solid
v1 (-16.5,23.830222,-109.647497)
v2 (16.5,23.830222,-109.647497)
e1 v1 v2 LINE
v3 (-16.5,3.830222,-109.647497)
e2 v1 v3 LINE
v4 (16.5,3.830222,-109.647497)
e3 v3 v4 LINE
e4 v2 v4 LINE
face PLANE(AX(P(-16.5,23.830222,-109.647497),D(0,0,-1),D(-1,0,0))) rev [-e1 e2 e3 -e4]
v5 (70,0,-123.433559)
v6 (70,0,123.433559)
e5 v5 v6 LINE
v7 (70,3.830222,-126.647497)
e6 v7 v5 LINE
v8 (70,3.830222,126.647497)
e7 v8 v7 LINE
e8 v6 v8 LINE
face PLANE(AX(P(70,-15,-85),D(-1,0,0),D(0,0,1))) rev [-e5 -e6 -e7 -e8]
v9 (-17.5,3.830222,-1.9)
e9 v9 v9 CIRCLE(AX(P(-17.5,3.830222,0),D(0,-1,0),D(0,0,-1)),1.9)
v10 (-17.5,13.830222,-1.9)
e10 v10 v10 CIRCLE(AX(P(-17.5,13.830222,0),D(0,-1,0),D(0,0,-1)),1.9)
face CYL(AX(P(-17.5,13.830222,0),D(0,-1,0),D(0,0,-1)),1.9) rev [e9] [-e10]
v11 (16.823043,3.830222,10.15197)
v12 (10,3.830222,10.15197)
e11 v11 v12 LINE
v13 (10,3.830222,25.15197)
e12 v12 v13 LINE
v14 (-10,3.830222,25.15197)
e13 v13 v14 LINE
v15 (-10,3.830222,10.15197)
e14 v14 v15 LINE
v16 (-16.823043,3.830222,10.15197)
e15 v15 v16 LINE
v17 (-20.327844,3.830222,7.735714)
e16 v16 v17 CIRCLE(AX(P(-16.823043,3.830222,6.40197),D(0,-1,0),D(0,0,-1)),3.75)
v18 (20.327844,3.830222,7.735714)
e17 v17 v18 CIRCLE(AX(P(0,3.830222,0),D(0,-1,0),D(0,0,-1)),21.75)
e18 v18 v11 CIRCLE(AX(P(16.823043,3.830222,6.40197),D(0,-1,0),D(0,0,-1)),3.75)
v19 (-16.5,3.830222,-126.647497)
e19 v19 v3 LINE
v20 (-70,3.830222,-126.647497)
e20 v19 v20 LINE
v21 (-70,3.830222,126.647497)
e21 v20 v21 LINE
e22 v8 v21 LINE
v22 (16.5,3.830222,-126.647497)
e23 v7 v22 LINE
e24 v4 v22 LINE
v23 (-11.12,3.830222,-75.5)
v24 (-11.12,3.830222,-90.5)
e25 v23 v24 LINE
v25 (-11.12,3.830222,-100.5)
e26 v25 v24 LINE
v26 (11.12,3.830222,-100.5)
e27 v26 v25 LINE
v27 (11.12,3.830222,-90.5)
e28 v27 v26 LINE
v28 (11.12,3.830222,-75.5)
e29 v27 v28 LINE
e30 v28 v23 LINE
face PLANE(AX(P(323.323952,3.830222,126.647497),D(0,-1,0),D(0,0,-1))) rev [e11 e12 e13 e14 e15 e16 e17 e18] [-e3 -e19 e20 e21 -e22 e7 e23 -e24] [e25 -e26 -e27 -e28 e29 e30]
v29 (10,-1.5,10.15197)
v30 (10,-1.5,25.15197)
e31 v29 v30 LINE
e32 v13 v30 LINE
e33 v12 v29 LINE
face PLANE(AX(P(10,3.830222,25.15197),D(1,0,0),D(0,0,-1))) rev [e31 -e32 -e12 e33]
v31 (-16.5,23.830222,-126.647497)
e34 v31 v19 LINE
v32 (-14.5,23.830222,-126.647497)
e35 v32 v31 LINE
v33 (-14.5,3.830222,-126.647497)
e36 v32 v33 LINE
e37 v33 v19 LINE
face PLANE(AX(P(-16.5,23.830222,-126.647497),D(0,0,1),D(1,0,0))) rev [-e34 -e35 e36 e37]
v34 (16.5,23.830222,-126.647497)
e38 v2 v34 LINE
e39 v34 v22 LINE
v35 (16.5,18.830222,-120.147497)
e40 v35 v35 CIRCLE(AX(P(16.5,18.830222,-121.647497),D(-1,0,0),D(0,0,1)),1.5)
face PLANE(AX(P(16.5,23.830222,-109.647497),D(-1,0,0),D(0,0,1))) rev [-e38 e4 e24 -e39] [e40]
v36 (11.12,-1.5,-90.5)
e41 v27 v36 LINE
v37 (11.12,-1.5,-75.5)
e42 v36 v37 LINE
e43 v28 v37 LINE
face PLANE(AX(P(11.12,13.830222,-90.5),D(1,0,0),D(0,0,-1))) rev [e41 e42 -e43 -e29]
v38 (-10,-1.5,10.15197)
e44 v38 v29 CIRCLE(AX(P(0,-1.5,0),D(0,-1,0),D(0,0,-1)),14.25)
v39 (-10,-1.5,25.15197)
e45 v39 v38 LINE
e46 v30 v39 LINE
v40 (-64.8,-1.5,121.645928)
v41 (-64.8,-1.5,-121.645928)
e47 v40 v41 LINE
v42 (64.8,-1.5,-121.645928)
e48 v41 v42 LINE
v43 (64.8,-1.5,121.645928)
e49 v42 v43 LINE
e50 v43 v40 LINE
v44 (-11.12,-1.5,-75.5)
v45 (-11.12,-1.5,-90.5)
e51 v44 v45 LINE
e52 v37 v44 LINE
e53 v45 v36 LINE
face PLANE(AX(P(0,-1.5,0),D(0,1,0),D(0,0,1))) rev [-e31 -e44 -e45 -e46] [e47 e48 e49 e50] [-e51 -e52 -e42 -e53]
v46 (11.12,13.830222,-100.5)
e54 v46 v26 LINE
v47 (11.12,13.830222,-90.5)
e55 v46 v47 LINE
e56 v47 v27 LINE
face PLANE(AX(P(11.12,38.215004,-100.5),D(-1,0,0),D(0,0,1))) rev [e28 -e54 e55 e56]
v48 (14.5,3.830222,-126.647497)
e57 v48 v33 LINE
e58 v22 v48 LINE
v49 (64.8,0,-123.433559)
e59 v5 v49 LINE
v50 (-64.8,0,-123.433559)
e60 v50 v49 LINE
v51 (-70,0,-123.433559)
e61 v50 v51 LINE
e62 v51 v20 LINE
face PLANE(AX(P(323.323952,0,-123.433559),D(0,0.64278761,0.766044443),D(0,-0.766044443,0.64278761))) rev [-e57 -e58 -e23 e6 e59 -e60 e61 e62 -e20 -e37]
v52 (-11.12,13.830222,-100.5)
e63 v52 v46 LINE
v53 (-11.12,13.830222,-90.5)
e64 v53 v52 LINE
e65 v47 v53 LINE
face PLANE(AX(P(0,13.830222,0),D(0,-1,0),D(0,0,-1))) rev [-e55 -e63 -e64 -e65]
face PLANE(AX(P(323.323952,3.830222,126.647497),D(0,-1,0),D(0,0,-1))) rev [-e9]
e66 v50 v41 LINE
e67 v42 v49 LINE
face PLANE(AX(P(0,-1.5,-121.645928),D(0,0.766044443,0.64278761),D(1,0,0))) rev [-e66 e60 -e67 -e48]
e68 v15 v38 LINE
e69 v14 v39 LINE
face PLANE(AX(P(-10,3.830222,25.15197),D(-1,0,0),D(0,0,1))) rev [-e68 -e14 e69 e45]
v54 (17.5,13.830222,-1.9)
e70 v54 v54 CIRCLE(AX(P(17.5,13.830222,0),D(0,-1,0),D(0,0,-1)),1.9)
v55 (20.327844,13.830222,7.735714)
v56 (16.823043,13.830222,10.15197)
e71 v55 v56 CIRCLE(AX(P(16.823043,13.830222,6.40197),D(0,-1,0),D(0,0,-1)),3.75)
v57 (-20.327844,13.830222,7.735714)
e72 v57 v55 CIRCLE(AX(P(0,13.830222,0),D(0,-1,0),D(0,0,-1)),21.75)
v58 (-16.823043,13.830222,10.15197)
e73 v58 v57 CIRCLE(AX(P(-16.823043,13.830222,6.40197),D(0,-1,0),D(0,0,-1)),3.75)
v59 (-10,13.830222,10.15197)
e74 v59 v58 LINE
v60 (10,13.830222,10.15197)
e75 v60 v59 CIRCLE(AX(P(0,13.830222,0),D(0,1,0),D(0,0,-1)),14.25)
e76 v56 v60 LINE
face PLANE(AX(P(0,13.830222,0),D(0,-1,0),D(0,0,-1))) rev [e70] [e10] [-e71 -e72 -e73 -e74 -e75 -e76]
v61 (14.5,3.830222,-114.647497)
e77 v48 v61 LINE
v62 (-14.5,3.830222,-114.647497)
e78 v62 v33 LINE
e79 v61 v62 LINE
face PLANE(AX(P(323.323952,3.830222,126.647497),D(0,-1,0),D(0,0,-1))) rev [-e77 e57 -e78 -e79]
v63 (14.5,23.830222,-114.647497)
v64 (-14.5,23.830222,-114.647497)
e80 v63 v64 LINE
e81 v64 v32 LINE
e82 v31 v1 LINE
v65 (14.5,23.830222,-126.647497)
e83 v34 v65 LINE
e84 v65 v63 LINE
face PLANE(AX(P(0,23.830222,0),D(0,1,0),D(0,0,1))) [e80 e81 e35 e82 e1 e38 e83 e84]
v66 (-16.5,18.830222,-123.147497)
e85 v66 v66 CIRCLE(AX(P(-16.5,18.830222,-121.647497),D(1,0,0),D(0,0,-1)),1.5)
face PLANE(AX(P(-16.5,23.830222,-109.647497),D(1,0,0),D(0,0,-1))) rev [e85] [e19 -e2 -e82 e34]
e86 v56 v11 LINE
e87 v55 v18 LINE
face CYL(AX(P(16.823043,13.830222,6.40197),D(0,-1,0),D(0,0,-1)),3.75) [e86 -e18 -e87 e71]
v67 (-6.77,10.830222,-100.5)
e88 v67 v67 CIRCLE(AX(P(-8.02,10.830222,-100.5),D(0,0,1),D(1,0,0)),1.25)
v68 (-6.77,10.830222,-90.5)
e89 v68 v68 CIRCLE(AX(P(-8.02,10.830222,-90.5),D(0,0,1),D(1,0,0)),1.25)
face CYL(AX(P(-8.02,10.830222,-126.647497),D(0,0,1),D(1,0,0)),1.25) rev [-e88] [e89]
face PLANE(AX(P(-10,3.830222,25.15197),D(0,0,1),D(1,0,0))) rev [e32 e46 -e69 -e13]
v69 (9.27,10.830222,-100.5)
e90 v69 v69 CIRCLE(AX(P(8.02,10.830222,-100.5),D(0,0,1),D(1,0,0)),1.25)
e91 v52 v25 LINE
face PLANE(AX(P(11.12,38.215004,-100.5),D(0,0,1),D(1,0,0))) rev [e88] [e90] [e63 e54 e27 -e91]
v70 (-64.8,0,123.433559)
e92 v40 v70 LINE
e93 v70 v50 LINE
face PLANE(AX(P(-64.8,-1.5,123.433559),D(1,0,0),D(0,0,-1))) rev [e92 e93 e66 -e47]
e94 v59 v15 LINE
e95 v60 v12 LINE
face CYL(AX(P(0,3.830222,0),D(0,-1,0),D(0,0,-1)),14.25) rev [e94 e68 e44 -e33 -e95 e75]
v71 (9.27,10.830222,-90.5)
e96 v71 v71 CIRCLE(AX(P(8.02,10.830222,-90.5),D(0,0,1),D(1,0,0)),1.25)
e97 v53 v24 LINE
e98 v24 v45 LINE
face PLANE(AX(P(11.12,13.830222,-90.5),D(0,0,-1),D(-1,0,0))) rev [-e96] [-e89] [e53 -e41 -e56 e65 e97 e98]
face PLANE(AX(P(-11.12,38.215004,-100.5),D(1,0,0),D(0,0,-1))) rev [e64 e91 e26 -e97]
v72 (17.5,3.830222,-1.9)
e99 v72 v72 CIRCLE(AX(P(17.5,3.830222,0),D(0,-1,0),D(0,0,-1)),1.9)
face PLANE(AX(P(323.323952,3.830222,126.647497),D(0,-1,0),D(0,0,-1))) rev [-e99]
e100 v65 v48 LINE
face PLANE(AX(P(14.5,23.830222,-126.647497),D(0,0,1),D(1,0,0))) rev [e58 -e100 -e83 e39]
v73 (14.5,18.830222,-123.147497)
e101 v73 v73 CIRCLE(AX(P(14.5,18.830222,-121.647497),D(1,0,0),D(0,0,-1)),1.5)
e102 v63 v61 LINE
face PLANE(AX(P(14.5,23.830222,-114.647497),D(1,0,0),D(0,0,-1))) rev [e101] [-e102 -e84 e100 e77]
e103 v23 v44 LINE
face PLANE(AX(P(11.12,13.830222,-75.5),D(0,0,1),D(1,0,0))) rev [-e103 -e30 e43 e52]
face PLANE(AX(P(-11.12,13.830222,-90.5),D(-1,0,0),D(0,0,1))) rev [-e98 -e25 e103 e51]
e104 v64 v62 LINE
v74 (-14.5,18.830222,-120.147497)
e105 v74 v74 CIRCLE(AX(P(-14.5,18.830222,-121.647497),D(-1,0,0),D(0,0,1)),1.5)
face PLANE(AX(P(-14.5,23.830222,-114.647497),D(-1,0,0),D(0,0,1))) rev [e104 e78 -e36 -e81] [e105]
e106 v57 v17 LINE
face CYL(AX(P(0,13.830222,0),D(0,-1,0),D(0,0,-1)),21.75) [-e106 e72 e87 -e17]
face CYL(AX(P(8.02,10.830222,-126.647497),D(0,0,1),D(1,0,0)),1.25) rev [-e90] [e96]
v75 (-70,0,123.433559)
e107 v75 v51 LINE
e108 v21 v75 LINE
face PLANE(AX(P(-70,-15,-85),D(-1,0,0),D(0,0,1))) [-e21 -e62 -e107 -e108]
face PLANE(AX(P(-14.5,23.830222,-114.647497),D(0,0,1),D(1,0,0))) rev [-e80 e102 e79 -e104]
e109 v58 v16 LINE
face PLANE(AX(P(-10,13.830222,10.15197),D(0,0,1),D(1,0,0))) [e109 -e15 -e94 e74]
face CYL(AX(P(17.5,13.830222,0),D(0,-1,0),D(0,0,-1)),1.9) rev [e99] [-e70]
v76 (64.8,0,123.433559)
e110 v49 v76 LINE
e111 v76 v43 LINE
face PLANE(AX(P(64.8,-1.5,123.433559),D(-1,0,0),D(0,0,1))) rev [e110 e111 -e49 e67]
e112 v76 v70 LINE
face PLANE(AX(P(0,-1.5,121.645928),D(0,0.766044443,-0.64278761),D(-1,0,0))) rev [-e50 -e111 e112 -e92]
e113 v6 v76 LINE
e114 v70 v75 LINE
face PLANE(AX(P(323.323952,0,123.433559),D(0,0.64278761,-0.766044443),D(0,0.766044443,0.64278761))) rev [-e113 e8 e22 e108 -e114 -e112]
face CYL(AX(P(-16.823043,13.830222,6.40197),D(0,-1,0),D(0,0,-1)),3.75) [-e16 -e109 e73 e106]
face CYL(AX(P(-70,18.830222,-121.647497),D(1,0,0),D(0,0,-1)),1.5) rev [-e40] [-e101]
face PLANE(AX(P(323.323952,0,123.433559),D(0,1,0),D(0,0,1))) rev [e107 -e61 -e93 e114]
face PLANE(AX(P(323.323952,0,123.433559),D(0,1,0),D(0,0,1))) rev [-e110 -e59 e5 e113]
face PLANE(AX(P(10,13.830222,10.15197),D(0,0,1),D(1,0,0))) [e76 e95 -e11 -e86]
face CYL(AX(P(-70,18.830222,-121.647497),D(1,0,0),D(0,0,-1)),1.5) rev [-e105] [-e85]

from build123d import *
from OCP.BRepFilletAPI import BRepFilletAPI_MakeChamfer

# Parameters (mm, degrees)
BOSS_EXTRU_1_DEPTH           = 70
BOSS_EXTRU_1_DEPTH_BACK      = 70
ESQUISSE12_W                 = 129.6
ESQUISSE12_H                 = 246.867117592
BOSS_EXTRU_7_DEPTH           = 1.5
CHANFREIN1_SIZE              = 1.5
CHANFREIN1_SIZE_2            = 1.787630389
ENL_V_MAT_EXTRU_1_DEPTH      = 209.036677197
ENL_V_MAT_EXTRU_1_DEPTH_BACK = 209.036677197
BOSS_EXTRU_4_START           = -10
ESQUISSE5_R                  = 1.9
BOSS_EXTRU_4_DEPTH           = 10
ENL_V_MAT_EXTRU_2_DEPTH      = 146.364588204
ENL_V_MAT_EXTRU_2_DEPTH_BACK = 146.364588204
ESQUISSE6_W                  = 22.24
ESQUISSE6_H                  = 15
ESQUISSE7_W                  = 22.24
ESQUISSE7_H                  = 10
BOSS_EXTRU_5_DEPTH           = 10
ESQUISSE8_R                  = 1.25
ENL_V_MAT_EXTRU_3_DEPTH      = 229.570143353
BOSS_EXTRU_6_DEPTH           = 20
ENL_V_MAT_EXTRU_4_DEPTH      = 147.654246266
ENL_V_MAT_EXTRU_4_DEPTH_BACK = 147.654246266
ESQUISSE11_R                 = 1.5


with BuildPart() as part:
    # Esquisse1 → Boss.-Extru.1 (new, two sides: drawn at the far end of the back side and taken through both)
    with BuildSketch(Plane(origin=(0, 0, 0), x_dir=(0, -1, 0), z_dir=(1, 0, 0)).offset(-BOSS_EXTRU_1_DEPTH_BACK)):
        Polygon((0, -123.433558796), (0, 123.433558796), (-3.830222216, 126.647496845), (-3.830222216, -126.647496845), align=None)
    extrude(amount=BOSS_EXTRU_1_DEPTH + BOSS_EXTRU_1_DEPTH_BACK)

    # Esquisse12 → Boss.-Extru.7 (add)
    with BuildSketch(Plane(origin=(0, 0, 0), x_dir=(-1, 0, 0), z_dir=(0, -1, 0))):
        Rectangle(ESQUISSE12_W, ESQUISSE12_H)
    extrude(amount=BOSS_EXTRU_7_DEPTH)

    # Chanfrein1
    chanfrein1_edges_1 = [part.edges().sort_by_distance(p)[0] for p in [
        (0, -1.5, 123.433558796),
    ]]
    chanfrein1_side_1 = [part.faces().sort_by_distance(p)[0] for p in [
        (0, -1.47, 123.433558796),
    ]]
    chanfrein1_edges_2 = [part.edges().sort_by_distance(p)[0] for p in [
        (0, -1.5, -123.433558796),
    ]]
    chanfrein1_side_2 = [part.faces().sort_by_distance(p)[0] for p in [
        (0, -1.47, -123.433558796),
    ]]
    chanfrein1 = BRepFilletAPI_MakeChamfer(part.part.solid().wrapped)
    for e in chanfrein1_edges_1:
        chanfrein1.Add(CHANFREIN1_SIZE - 0.0001, CHANFREIN1_SIZE_2 - 0.0001, e.wrapped, chanfrein1_side_1[0].wrapped)
    for e in chanfrein1_edges_2:
        chanfrein1.Add(CHANFREIN1_SIZE - 0.0001, CHANFREIN1_SIZE_2 - 0.0001, e.wrapped, chanfrein1_side_2[0].wrapped)
    add(Compound.cast(chanfrein1.Shape()), mode=Mode.REPLACE)  # a hair under: the kernel refuses the full size

    # Esquisse4 → Enlèv. mat.-Extru.1 (cut, two sides: drawn at the far end of the back side and taken through both)
    with BuildSketch(Plane(origin=(95, 0, 0), x_dir=(-1, 0, 0), z_dir=(0, -1, 0)).offset(-ENL_V_MAT_EXTRU_1_DEPTH_BACK)):
        with BuildLine():
            Line((105, -25.151970252), (85, -25.151970252))
            Line((85, -25.151970252), (85, -10.151970252))
            ThreePointArc((85, -10.151970252), (95, 14.25), (105, -10.151970252))
            Line((105, -10.151970252), (105, -25.151970252))
        make_face()
    extrude(amount=ENL_V_MAT_EXTRU_1_DEPTH + ENL_V_MAT_EXTRU_1_DEPTH_BACK, mode=Mode.SUBTRACT)

    # Esquisse5 → Boss.-Extru.4 (add)
    with BuildSketch(Plane(origin=(95, 3.830222216, 0), x_dir=(-1, 0, 0), z_dir=(0, -1, 0)).offset(BOSS_EXTRU_4_START)):
        with BuildLine():
            Line((105, -10.151970252), (111.823043033, -10.151970252))
            ThreePointArc((111.823043033, -10.151970252), (113.951535544, -9.489367154), (115.327843665, -7.735714055))
            ThreePointArc((115.327843665, -7.735714055), (95, 21.75), (74.672156335, -7.735714055))
            ThreePointArc((74.672156335, -7.735714055), (76.048464456, -9.489367154), (78.176956967, -10.151970252))
            Line((78.176956967, -10.151970252), (85, -10.151970252))
            ThreePointArc((85, -10.151970252), (95, 14.25), (105, -10.151970252))
        make_face()
        with Locations(Location((77.5, 0, 0), (0, 0, 90))):
            Circle(ESQUISSE5_R, mode=Mode.SUBTRACT)
        with Locations(Location((112.5, 0, 0), (0, 0, 90))):
            Circle(ESQUISSE5_R, mode=Mode.SUBTRACT)
    extrude(amount=BOSS_EXTRU_4_DEPTH)

    # Esquisse6 → Enlèv. mat.-Extru.2 (cut, two sides: drawn at the far end of the back side and taken through both)
    with BuildSketch(Plane(origin=(0, 0, 0), x_dir=(-1, 0, 0), z_dir=(0, -1, 0)).offset(-ENL_V_MAT_EXTRU_2_DEPTH_BACK)):
        with Locations((0, 83)):
            Rectangle(ESQUISSE6_W, ESQUISSE6_H)
    extrude(amount=ENL_V_MAT_EXTRU_2_DEPTH + ENL_V_MAT_EXTRU_2_DEPTH_BACK, mode=Mode.SUBTRACT)

    # Esquisse7 → Boss.-Extru.5 (add)
    with BuildSketch(Plane(origin=(0, 3.830222216, 0), x_dir=(1, 0, 0), z_dir=(0, 1, 0))):
        with Locations((0, 95.5)):
            Rectangle(ESQUISSE7_W, ESQUISSE7_H)
    extrude(amount=BOSS_EXTRU_5_DEPTH)

    # Esquisse8 → Enlèv. mat.-Extru.3 (cut, through all)
    with BuildSketch(Plane.XY.offset(-90.5)):
        with Locations((-8.02, 10.830222216)):
            Circle(ESQUISSE8_R)
        with Locations((8.02, 10.830222216)):
            Circle(ESQUISSE8_R)
    extrude(amount=-ENL_V_MAT_EXTRU_3_DEPTH, mode=Mode.SUBTRACT)

    # Esquisse9 → Boss.-Extru.6 (add)
    with BuildSketch(Plane(origin=(0, 3.830222216, 0), x_dir=(1, 0, 0), z_dir=(0, 1, 0))):
        Polygon((-14.5, 114.647496845), (14.5, 114.647496845), (14.5, 126.647496845), (16.5, 126.647496845), (16.5, 109.647496845), (-16.5, 109.647496845), (-16.5, 126.647496845), (-14.5, 126.647496845), align=None)
    extrude(amount=BOSS_EXTRU_6_DEPTH)

    # Esquisse11 → Enlèv. mat.-Extru.4 (cut, two sides: drawn at the far end of the back side and taken through both)
    with BuildSketch(Plane(origin=(0, 0, 0), x_dir=(0, 0, -1), z_dir=(1, 0, 0)).offset(-ENL_V_MAT_EXTRU_4_DEPTH_BACK)):
        with Locations((121.647496845, 18.830222216)):
            Circle(ESQUISSE11_R)
    extrude(amount=ENL_V_MAT_EXTRU_4_DEPTH + ENL_V_MAT_EXTRU_4_DEPTH_BACK, mode=Mode.SUBTRACT)


solid = part.part
